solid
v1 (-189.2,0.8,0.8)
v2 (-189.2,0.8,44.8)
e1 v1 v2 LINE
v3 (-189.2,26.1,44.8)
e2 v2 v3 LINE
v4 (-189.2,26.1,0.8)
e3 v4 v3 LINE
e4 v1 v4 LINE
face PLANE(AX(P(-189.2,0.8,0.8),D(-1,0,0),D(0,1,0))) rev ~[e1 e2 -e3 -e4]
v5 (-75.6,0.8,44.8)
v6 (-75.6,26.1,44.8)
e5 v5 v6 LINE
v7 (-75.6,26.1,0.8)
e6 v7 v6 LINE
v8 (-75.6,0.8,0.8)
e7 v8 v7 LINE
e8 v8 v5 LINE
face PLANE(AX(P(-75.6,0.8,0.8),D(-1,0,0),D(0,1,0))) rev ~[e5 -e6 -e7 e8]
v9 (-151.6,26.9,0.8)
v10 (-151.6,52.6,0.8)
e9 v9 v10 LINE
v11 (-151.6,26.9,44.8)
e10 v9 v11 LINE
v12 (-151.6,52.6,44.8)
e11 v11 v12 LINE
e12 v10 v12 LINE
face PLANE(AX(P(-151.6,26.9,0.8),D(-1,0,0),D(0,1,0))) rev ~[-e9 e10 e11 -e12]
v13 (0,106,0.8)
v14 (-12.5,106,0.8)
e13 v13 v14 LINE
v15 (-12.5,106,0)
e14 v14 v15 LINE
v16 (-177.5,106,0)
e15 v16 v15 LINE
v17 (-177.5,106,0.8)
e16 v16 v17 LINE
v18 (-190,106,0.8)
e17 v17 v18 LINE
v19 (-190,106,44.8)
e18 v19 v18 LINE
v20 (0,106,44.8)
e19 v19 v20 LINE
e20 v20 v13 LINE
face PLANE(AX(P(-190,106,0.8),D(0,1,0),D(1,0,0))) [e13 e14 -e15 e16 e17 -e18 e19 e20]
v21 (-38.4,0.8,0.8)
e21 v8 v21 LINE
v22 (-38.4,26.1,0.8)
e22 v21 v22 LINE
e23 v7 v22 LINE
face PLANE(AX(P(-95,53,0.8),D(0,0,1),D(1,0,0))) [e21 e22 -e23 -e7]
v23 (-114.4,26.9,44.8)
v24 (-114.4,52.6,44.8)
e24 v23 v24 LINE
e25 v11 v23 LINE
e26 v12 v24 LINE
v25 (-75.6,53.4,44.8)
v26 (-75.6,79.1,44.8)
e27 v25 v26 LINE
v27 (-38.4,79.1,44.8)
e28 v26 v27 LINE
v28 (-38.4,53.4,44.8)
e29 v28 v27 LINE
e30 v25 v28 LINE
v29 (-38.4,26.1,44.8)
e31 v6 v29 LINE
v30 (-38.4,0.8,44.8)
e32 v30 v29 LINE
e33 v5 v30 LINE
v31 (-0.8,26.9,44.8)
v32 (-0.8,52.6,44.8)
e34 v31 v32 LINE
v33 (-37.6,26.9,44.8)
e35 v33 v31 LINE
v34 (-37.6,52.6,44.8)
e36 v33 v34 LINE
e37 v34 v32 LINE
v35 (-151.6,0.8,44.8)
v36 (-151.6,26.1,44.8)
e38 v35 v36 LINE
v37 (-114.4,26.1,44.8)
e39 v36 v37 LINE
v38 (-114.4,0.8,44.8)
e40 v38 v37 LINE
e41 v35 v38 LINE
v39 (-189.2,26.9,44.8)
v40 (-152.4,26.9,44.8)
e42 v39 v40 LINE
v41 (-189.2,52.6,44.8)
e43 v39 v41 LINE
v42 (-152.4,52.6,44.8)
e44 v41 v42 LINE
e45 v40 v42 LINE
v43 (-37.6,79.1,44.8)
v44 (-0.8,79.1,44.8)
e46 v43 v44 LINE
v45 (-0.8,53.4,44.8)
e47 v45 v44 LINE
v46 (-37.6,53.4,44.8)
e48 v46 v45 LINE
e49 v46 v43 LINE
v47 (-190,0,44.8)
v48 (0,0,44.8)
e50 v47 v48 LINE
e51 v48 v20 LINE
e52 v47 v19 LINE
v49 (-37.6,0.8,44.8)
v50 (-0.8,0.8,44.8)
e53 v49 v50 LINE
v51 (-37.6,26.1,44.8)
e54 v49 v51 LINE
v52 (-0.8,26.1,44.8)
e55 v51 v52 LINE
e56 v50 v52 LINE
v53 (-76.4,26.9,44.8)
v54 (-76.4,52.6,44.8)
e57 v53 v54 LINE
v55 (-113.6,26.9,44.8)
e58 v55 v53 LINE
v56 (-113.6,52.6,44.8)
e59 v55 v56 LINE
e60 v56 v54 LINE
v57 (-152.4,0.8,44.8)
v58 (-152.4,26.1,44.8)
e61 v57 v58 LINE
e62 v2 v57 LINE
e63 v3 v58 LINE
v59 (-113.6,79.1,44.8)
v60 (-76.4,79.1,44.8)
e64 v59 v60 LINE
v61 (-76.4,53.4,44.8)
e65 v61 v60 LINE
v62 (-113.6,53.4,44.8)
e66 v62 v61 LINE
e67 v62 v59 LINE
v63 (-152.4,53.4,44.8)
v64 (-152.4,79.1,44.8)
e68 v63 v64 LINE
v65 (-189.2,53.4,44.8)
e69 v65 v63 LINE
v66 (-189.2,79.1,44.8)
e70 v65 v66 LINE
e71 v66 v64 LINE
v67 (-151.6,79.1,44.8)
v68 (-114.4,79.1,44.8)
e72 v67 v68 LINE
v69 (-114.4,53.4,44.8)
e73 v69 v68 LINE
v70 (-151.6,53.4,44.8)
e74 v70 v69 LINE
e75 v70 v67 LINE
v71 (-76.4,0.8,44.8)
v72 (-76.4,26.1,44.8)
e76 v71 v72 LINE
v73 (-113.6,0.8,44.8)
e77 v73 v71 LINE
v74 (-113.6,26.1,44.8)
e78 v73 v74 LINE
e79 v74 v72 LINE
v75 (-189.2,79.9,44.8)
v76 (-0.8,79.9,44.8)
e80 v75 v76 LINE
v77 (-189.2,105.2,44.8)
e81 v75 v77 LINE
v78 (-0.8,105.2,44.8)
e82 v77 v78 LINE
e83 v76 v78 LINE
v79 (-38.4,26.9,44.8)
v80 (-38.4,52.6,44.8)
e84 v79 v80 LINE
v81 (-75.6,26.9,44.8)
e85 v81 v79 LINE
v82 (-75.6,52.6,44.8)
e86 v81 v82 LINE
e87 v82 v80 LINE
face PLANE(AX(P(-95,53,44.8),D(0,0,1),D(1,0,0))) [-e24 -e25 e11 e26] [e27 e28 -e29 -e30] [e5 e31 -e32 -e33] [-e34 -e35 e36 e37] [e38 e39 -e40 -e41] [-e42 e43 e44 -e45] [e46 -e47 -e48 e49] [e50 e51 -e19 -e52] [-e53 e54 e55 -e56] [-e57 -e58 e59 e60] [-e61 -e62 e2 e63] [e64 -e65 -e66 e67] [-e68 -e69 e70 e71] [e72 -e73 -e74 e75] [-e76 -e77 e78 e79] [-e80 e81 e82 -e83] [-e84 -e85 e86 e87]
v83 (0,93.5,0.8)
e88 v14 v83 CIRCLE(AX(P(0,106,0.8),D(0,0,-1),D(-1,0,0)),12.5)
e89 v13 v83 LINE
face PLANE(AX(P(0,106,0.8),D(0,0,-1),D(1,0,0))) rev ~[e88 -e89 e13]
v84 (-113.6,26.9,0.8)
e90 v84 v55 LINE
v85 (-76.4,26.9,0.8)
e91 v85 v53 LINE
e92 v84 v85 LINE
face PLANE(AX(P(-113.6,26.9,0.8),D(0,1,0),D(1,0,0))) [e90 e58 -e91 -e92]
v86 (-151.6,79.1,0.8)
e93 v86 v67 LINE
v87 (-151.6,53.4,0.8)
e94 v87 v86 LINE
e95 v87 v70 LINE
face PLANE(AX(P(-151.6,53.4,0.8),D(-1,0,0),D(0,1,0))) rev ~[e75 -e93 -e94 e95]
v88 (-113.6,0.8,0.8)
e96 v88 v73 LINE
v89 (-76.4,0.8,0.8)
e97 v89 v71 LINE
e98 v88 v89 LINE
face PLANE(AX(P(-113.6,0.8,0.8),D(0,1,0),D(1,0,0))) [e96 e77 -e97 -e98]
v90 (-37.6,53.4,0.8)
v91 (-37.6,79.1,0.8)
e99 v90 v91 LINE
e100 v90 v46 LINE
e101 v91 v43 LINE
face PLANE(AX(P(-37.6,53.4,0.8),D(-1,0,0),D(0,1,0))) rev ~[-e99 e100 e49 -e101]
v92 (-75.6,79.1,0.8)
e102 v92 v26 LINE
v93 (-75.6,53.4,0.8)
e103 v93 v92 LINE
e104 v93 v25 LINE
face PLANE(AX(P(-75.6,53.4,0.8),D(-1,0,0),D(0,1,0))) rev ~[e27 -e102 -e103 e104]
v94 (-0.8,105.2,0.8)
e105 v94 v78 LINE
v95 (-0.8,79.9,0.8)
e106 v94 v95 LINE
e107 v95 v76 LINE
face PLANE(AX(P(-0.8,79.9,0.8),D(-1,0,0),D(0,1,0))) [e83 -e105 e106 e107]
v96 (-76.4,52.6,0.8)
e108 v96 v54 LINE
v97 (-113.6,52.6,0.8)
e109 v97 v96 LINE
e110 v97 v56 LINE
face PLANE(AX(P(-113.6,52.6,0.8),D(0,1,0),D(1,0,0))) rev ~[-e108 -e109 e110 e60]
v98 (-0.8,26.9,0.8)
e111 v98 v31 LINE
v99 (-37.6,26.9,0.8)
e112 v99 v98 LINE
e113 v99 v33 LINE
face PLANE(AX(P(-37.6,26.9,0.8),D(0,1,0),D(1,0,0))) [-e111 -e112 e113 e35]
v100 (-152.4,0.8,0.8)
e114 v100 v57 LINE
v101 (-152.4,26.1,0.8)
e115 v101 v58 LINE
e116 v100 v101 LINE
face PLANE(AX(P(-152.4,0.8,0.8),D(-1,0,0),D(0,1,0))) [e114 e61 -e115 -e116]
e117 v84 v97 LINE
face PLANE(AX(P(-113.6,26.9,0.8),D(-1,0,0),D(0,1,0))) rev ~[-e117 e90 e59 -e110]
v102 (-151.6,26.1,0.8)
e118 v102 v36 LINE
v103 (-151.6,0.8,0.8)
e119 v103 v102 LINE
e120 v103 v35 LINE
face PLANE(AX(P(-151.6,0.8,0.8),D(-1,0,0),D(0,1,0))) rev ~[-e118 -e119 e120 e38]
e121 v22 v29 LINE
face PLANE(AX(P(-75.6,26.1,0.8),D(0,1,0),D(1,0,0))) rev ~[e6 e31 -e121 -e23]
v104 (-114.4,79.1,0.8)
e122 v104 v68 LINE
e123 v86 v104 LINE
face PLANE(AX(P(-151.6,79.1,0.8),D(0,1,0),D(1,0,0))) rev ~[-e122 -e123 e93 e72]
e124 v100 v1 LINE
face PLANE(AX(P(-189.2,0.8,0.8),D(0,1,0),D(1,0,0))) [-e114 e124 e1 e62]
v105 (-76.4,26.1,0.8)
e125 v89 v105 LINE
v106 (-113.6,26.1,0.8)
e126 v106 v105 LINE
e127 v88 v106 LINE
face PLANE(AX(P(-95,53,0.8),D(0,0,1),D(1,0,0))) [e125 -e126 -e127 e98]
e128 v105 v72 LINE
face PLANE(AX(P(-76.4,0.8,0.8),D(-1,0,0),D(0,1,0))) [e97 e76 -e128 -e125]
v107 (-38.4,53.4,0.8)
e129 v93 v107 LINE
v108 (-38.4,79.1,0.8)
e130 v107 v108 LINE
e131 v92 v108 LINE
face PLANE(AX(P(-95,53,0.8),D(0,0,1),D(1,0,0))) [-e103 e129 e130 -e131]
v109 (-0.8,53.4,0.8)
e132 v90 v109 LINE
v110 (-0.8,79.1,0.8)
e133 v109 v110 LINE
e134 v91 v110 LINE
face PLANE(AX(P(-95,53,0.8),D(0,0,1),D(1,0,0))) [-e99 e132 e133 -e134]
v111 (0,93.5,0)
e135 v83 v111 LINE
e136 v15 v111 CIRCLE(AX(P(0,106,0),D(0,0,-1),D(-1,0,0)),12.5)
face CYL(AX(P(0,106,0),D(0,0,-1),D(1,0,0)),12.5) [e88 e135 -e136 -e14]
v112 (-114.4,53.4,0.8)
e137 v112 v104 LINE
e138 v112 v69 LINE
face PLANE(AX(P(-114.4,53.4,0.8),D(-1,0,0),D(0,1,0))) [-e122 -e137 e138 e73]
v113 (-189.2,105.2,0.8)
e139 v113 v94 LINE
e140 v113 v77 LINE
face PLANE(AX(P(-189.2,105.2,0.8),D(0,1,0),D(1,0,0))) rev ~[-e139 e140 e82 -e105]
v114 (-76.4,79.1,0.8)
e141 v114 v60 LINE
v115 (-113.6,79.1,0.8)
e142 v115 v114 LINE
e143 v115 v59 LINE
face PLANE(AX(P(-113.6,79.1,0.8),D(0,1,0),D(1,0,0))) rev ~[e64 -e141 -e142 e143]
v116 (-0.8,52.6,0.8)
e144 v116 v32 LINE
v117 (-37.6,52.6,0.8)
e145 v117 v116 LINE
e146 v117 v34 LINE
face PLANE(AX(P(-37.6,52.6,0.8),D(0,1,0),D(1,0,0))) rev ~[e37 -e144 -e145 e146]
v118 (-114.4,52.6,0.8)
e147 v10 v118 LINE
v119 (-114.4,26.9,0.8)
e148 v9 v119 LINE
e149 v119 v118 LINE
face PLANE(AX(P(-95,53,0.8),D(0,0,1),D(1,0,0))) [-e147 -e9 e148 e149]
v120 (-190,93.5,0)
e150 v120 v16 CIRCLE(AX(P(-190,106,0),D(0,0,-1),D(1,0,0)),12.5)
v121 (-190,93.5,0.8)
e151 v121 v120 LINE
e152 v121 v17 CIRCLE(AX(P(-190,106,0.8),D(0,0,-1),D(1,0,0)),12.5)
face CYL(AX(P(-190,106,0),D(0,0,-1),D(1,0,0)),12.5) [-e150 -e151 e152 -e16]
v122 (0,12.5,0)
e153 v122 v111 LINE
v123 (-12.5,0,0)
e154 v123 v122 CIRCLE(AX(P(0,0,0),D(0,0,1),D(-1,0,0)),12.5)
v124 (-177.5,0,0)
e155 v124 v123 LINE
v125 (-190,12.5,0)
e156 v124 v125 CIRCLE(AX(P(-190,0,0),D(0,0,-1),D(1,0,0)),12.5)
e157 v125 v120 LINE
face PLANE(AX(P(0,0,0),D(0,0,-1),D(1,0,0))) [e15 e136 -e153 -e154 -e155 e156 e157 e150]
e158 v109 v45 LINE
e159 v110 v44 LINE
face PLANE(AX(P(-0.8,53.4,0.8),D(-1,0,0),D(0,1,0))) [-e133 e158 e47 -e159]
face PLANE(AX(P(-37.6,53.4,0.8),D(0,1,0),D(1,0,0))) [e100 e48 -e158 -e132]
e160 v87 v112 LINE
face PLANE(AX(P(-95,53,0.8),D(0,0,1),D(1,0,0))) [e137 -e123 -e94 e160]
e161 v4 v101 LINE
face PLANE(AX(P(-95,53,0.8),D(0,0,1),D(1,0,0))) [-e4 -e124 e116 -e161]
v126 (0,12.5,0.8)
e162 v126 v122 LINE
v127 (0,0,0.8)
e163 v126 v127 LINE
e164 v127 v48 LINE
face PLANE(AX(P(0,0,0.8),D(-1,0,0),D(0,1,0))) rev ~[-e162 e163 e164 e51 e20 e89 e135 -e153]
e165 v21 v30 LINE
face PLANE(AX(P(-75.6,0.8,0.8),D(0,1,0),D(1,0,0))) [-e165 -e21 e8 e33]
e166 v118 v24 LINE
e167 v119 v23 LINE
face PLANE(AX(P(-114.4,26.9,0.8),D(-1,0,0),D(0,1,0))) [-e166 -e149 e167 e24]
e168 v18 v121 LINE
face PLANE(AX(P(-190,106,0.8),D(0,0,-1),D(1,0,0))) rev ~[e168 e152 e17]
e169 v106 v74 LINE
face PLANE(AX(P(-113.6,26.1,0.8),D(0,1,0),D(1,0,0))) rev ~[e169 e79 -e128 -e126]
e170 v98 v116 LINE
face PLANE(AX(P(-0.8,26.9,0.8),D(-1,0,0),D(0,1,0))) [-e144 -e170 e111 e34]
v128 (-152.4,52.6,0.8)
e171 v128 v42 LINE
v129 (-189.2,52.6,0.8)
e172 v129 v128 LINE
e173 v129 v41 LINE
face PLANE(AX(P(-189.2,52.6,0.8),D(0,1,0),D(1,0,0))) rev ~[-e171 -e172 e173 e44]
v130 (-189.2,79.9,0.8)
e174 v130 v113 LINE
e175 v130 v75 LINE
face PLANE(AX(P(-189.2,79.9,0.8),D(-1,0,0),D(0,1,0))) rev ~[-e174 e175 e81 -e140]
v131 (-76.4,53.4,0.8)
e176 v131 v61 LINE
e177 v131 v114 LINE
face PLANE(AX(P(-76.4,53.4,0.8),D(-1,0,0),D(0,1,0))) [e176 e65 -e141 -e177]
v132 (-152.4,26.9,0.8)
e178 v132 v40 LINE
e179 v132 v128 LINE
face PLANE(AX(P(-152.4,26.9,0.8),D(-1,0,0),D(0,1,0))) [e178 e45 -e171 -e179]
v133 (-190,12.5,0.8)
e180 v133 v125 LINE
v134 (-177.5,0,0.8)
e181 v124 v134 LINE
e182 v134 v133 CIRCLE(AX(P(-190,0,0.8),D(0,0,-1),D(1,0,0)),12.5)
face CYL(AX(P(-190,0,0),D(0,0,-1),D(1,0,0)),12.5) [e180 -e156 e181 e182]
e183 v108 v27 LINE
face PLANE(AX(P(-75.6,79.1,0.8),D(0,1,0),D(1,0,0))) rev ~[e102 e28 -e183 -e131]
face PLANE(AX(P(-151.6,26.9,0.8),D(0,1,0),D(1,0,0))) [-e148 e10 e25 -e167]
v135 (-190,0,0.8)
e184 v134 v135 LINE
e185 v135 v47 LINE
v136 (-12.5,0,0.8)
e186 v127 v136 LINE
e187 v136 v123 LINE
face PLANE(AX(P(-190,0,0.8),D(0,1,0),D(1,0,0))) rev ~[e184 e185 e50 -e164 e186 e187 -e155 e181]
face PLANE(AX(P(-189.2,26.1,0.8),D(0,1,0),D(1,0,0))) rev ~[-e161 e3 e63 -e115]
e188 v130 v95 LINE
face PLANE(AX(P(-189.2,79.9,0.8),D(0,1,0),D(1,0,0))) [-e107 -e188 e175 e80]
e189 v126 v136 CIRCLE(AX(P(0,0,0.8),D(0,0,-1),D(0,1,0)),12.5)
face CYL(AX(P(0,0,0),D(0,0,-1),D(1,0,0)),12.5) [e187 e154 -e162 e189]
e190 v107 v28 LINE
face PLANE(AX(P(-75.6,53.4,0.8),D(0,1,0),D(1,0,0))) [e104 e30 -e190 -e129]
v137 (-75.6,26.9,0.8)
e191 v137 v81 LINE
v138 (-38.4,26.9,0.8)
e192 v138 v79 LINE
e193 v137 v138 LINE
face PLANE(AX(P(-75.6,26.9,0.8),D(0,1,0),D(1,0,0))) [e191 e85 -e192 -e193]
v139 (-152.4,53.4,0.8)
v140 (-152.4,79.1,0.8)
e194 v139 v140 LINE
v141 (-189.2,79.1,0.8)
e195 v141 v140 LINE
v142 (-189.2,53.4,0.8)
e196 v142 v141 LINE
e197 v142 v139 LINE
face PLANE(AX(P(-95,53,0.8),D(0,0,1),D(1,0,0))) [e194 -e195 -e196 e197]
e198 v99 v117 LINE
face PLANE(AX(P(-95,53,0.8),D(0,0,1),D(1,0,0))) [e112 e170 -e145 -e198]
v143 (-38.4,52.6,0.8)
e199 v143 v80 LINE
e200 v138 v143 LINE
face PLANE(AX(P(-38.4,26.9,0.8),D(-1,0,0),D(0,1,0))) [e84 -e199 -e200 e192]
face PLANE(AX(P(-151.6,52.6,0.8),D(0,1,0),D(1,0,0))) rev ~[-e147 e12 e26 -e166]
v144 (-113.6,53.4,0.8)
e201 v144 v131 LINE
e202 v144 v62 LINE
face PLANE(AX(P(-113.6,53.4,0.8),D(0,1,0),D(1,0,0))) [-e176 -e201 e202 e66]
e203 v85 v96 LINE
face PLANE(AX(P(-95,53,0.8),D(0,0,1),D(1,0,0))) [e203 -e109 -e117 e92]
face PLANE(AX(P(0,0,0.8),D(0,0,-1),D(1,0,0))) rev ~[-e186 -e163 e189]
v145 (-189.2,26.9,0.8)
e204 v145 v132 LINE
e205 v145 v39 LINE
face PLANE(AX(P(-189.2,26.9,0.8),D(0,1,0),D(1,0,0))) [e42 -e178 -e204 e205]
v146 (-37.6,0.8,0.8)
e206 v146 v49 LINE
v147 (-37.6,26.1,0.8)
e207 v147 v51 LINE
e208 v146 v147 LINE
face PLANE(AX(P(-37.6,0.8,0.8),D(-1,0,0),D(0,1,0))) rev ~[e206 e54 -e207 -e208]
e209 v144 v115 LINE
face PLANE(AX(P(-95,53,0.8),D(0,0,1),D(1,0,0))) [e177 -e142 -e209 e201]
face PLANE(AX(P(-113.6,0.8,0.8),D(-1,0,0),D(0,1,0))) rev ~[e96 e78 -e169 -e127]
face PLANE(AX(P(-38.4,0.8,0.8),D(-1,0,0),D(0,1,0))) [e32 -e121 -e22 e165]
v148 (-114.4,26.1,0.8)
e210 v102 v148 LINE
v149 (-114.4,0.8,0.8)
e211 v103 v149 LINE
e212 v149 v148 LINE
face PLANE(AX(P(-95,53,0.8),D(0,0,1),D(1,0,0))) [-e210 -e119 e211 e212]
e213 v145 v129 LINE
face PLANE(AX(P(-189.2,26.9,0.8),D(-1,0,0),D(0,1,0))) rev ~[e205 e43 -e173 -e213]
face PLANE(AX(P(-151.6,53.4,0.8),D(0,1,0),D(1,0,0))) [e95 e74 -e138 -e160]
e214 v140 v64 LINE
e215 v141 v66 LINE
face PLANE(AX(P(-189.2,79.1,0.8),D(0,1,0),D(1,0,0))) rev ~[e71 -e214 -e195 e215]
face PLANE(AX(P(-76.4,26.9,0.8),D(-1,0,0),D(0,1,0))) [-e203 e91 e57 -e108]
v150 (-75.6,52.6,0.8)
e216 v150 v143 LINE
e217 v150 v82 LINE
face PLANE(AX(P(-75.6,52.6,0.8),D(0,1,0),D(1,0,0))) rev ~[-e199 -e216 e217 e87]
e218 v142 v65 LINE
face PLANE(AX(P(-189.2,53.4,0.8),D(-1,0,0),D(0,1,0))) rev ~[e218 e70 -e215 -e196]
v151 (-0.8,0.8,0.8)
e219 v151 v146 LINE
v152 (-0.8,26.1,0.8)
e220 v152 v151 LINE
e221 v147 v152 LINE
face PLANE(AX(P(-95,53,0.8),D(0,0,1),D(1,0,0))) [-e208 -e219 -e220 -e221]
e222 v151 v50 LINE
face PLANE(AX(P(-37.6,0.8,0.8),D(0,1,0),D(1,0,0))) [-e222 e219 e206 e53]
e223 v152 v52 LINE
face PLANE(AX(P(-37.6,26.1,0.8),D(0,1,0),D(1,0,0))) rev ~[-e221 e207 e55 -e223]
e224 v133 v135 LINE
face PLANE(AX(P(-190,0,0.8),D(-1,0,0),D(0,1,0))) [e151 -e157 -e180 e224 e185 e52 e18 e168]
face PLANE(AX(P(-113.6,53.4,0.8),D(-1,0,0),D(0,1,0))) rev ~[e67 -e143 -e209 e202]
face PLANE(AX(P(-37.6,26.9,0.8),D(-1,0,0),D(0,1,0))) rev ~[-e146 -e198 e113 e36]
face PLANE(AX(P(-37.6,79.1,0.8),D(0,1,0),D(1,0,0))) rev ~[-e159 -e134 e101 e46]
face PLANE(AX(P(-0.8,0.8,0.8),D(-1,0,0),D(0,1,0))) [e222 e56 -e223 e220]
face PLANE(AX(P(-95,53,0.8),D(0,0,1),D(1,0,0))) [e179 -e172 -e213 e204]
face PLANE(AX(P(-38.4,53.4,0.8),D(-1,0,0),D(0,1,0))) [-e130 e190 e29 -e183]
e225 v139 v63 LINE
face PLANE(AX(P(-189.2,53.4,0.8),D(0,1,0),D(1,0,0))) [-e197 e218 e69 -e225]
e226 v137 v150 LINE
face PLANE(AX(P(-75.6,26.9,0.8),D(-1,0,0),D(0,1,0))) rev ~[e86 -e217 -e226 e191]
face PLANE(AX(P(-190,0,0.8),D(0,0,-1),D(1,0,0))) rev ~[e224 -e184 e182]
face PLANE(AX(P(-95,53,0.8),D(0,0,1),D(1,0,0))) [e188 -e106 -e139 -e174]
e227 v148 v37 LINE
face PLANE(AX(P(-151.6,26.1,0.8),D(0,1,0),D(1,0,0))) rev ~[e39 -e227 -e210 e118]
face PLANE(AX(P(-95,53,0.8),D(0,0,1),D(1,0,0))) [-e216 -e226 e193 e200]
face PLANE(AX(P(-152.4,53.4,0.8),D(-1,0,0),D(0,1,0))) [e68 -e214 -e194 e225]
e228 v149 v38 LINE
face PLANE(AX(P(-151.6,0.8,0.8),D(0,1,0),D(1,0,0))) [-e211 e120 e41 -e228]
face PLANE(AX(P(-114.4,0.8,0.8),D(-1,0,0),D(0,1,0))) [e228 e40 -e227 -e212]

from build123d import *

# Parameters (mm, degrees)
F0_W     = 190
F0_H     = 106
F1_DEPTH = 0.8
F2_W     = 190
F2_H     = 106
F2_W_2   = 36.8
F2_H_2   = 25.3
F2_W_3   = 37.2
F2_H_3   = 25.7
F2_W_4   = 188.4
F3_DEPTH = 44
F4_R     = 12.5
F5_DEPTH = 0.8


# Not quite as in the source:
# - a feature names something its author has since deleted; it is built from what else it names


with BuildPart() as f1:
    # F0 (on Top) → F1 (new body)
    with BuildSketch(Plane.XY):
        with Locations((-95, 53)):
            Rectangle(F0_W, F0_H)
    extrude(amount=F1_DEPTH)

    # F2 (on face) → F3 (join)
    with BuildSketch(Plane.XY.offset(0.8)):
        with Locations((-95, 53)):
            Rectangle(F2_W, F2_H)
        with Locations((-170.8, 13.45)):
            Rectangle(F2_W_2, F2_H_2, mode=Mode.SUBTRACT)
        with Locations((-133, 13.45)):
            Rectangle(F2_W_3, F2_H_2, mode=Mode.SUBTRACT)
        with Locations((-170.8, 39.75)):
            Rectangle(F2_W_2, F2_H_3, mode=Mode.SUBTRACT)
        with Locations((-133, 39.75)):
            Rectangle(F2_W_3, F2_H_3, mode=Mode.SUBTRACT)
        with Locations((-95, 13.45)):
            Rectangle(F2_W_3, F2_H_2, mode=Mode.SUBTRACT)
        with Locations((-57, 13.45)):
            Rectangle(F2_W_3, F2_H_2, mode=Mode.SUBTRACT)
        with Locations((-19.2, 13.45)):
            Rectangle(F2_W_2, F2_H_2, mode=Mode.SUBTRACT)
        with Locations((-95, 39.75)):
            Rectangle(F2_W_3, F2_H_3, mode=Mode.SUBTRACT)
        with Locations((-57, 39.75)):
            Rectangle(F2_W_3, F2_H_3, mode=Mode.SUBTRACT)
        with Locations((-19.2, 39.75)):
            Rectangle(F2_W_2, F2_H_3, mode=Mode.SUBTRACT)
        with Locations((-170.8, 66.25)):
            Rectangle(F2_W_2, F2_H_3, mode=Mode.SUBTRACT)
        with Locations((-133, 66.25)):
            Rectangle(F2_W_3, F2_H_3, mode=Mode.SUBTRACT)
        with Locations((-95, 66.25)):
            Rectangle(F2_W_3, F2_H_3, mode=Mode.SUBTRACT)
        with Locations((-57, 66.25)):
            Rectangle(F2_W_3, F2_H_3, mode=Mode.SUBTRACT)
        with Locations((-19.2, 66.25)):
            Rectangle(F2_W_2, F2_H_3, mode=Mode.SUBTRACT)
        with Locations((-95, 92.55)):
            Rectangle(F2_W_4, F2_H_2, mode=Mode.SUBTRACT)
    extrude(amount=F3_DEPTH)

    # F4 (on face) → F5 (join)
    with BuildSketch(Plane(origin=(0, 0, 0), x_dir=(1, 0, 0), z_dir=(0, 0, -1))):
        Circle(F4_R)
        with Locations((-190, 0)):
            Circle(F4_R)
        with Locations((-190, -106)):
            Circle(F4_R)
        with Locations((0, -106)):
            Circle(F4_R)
    extrude(amount=-F5_DEPTH)


solid = f1.part
